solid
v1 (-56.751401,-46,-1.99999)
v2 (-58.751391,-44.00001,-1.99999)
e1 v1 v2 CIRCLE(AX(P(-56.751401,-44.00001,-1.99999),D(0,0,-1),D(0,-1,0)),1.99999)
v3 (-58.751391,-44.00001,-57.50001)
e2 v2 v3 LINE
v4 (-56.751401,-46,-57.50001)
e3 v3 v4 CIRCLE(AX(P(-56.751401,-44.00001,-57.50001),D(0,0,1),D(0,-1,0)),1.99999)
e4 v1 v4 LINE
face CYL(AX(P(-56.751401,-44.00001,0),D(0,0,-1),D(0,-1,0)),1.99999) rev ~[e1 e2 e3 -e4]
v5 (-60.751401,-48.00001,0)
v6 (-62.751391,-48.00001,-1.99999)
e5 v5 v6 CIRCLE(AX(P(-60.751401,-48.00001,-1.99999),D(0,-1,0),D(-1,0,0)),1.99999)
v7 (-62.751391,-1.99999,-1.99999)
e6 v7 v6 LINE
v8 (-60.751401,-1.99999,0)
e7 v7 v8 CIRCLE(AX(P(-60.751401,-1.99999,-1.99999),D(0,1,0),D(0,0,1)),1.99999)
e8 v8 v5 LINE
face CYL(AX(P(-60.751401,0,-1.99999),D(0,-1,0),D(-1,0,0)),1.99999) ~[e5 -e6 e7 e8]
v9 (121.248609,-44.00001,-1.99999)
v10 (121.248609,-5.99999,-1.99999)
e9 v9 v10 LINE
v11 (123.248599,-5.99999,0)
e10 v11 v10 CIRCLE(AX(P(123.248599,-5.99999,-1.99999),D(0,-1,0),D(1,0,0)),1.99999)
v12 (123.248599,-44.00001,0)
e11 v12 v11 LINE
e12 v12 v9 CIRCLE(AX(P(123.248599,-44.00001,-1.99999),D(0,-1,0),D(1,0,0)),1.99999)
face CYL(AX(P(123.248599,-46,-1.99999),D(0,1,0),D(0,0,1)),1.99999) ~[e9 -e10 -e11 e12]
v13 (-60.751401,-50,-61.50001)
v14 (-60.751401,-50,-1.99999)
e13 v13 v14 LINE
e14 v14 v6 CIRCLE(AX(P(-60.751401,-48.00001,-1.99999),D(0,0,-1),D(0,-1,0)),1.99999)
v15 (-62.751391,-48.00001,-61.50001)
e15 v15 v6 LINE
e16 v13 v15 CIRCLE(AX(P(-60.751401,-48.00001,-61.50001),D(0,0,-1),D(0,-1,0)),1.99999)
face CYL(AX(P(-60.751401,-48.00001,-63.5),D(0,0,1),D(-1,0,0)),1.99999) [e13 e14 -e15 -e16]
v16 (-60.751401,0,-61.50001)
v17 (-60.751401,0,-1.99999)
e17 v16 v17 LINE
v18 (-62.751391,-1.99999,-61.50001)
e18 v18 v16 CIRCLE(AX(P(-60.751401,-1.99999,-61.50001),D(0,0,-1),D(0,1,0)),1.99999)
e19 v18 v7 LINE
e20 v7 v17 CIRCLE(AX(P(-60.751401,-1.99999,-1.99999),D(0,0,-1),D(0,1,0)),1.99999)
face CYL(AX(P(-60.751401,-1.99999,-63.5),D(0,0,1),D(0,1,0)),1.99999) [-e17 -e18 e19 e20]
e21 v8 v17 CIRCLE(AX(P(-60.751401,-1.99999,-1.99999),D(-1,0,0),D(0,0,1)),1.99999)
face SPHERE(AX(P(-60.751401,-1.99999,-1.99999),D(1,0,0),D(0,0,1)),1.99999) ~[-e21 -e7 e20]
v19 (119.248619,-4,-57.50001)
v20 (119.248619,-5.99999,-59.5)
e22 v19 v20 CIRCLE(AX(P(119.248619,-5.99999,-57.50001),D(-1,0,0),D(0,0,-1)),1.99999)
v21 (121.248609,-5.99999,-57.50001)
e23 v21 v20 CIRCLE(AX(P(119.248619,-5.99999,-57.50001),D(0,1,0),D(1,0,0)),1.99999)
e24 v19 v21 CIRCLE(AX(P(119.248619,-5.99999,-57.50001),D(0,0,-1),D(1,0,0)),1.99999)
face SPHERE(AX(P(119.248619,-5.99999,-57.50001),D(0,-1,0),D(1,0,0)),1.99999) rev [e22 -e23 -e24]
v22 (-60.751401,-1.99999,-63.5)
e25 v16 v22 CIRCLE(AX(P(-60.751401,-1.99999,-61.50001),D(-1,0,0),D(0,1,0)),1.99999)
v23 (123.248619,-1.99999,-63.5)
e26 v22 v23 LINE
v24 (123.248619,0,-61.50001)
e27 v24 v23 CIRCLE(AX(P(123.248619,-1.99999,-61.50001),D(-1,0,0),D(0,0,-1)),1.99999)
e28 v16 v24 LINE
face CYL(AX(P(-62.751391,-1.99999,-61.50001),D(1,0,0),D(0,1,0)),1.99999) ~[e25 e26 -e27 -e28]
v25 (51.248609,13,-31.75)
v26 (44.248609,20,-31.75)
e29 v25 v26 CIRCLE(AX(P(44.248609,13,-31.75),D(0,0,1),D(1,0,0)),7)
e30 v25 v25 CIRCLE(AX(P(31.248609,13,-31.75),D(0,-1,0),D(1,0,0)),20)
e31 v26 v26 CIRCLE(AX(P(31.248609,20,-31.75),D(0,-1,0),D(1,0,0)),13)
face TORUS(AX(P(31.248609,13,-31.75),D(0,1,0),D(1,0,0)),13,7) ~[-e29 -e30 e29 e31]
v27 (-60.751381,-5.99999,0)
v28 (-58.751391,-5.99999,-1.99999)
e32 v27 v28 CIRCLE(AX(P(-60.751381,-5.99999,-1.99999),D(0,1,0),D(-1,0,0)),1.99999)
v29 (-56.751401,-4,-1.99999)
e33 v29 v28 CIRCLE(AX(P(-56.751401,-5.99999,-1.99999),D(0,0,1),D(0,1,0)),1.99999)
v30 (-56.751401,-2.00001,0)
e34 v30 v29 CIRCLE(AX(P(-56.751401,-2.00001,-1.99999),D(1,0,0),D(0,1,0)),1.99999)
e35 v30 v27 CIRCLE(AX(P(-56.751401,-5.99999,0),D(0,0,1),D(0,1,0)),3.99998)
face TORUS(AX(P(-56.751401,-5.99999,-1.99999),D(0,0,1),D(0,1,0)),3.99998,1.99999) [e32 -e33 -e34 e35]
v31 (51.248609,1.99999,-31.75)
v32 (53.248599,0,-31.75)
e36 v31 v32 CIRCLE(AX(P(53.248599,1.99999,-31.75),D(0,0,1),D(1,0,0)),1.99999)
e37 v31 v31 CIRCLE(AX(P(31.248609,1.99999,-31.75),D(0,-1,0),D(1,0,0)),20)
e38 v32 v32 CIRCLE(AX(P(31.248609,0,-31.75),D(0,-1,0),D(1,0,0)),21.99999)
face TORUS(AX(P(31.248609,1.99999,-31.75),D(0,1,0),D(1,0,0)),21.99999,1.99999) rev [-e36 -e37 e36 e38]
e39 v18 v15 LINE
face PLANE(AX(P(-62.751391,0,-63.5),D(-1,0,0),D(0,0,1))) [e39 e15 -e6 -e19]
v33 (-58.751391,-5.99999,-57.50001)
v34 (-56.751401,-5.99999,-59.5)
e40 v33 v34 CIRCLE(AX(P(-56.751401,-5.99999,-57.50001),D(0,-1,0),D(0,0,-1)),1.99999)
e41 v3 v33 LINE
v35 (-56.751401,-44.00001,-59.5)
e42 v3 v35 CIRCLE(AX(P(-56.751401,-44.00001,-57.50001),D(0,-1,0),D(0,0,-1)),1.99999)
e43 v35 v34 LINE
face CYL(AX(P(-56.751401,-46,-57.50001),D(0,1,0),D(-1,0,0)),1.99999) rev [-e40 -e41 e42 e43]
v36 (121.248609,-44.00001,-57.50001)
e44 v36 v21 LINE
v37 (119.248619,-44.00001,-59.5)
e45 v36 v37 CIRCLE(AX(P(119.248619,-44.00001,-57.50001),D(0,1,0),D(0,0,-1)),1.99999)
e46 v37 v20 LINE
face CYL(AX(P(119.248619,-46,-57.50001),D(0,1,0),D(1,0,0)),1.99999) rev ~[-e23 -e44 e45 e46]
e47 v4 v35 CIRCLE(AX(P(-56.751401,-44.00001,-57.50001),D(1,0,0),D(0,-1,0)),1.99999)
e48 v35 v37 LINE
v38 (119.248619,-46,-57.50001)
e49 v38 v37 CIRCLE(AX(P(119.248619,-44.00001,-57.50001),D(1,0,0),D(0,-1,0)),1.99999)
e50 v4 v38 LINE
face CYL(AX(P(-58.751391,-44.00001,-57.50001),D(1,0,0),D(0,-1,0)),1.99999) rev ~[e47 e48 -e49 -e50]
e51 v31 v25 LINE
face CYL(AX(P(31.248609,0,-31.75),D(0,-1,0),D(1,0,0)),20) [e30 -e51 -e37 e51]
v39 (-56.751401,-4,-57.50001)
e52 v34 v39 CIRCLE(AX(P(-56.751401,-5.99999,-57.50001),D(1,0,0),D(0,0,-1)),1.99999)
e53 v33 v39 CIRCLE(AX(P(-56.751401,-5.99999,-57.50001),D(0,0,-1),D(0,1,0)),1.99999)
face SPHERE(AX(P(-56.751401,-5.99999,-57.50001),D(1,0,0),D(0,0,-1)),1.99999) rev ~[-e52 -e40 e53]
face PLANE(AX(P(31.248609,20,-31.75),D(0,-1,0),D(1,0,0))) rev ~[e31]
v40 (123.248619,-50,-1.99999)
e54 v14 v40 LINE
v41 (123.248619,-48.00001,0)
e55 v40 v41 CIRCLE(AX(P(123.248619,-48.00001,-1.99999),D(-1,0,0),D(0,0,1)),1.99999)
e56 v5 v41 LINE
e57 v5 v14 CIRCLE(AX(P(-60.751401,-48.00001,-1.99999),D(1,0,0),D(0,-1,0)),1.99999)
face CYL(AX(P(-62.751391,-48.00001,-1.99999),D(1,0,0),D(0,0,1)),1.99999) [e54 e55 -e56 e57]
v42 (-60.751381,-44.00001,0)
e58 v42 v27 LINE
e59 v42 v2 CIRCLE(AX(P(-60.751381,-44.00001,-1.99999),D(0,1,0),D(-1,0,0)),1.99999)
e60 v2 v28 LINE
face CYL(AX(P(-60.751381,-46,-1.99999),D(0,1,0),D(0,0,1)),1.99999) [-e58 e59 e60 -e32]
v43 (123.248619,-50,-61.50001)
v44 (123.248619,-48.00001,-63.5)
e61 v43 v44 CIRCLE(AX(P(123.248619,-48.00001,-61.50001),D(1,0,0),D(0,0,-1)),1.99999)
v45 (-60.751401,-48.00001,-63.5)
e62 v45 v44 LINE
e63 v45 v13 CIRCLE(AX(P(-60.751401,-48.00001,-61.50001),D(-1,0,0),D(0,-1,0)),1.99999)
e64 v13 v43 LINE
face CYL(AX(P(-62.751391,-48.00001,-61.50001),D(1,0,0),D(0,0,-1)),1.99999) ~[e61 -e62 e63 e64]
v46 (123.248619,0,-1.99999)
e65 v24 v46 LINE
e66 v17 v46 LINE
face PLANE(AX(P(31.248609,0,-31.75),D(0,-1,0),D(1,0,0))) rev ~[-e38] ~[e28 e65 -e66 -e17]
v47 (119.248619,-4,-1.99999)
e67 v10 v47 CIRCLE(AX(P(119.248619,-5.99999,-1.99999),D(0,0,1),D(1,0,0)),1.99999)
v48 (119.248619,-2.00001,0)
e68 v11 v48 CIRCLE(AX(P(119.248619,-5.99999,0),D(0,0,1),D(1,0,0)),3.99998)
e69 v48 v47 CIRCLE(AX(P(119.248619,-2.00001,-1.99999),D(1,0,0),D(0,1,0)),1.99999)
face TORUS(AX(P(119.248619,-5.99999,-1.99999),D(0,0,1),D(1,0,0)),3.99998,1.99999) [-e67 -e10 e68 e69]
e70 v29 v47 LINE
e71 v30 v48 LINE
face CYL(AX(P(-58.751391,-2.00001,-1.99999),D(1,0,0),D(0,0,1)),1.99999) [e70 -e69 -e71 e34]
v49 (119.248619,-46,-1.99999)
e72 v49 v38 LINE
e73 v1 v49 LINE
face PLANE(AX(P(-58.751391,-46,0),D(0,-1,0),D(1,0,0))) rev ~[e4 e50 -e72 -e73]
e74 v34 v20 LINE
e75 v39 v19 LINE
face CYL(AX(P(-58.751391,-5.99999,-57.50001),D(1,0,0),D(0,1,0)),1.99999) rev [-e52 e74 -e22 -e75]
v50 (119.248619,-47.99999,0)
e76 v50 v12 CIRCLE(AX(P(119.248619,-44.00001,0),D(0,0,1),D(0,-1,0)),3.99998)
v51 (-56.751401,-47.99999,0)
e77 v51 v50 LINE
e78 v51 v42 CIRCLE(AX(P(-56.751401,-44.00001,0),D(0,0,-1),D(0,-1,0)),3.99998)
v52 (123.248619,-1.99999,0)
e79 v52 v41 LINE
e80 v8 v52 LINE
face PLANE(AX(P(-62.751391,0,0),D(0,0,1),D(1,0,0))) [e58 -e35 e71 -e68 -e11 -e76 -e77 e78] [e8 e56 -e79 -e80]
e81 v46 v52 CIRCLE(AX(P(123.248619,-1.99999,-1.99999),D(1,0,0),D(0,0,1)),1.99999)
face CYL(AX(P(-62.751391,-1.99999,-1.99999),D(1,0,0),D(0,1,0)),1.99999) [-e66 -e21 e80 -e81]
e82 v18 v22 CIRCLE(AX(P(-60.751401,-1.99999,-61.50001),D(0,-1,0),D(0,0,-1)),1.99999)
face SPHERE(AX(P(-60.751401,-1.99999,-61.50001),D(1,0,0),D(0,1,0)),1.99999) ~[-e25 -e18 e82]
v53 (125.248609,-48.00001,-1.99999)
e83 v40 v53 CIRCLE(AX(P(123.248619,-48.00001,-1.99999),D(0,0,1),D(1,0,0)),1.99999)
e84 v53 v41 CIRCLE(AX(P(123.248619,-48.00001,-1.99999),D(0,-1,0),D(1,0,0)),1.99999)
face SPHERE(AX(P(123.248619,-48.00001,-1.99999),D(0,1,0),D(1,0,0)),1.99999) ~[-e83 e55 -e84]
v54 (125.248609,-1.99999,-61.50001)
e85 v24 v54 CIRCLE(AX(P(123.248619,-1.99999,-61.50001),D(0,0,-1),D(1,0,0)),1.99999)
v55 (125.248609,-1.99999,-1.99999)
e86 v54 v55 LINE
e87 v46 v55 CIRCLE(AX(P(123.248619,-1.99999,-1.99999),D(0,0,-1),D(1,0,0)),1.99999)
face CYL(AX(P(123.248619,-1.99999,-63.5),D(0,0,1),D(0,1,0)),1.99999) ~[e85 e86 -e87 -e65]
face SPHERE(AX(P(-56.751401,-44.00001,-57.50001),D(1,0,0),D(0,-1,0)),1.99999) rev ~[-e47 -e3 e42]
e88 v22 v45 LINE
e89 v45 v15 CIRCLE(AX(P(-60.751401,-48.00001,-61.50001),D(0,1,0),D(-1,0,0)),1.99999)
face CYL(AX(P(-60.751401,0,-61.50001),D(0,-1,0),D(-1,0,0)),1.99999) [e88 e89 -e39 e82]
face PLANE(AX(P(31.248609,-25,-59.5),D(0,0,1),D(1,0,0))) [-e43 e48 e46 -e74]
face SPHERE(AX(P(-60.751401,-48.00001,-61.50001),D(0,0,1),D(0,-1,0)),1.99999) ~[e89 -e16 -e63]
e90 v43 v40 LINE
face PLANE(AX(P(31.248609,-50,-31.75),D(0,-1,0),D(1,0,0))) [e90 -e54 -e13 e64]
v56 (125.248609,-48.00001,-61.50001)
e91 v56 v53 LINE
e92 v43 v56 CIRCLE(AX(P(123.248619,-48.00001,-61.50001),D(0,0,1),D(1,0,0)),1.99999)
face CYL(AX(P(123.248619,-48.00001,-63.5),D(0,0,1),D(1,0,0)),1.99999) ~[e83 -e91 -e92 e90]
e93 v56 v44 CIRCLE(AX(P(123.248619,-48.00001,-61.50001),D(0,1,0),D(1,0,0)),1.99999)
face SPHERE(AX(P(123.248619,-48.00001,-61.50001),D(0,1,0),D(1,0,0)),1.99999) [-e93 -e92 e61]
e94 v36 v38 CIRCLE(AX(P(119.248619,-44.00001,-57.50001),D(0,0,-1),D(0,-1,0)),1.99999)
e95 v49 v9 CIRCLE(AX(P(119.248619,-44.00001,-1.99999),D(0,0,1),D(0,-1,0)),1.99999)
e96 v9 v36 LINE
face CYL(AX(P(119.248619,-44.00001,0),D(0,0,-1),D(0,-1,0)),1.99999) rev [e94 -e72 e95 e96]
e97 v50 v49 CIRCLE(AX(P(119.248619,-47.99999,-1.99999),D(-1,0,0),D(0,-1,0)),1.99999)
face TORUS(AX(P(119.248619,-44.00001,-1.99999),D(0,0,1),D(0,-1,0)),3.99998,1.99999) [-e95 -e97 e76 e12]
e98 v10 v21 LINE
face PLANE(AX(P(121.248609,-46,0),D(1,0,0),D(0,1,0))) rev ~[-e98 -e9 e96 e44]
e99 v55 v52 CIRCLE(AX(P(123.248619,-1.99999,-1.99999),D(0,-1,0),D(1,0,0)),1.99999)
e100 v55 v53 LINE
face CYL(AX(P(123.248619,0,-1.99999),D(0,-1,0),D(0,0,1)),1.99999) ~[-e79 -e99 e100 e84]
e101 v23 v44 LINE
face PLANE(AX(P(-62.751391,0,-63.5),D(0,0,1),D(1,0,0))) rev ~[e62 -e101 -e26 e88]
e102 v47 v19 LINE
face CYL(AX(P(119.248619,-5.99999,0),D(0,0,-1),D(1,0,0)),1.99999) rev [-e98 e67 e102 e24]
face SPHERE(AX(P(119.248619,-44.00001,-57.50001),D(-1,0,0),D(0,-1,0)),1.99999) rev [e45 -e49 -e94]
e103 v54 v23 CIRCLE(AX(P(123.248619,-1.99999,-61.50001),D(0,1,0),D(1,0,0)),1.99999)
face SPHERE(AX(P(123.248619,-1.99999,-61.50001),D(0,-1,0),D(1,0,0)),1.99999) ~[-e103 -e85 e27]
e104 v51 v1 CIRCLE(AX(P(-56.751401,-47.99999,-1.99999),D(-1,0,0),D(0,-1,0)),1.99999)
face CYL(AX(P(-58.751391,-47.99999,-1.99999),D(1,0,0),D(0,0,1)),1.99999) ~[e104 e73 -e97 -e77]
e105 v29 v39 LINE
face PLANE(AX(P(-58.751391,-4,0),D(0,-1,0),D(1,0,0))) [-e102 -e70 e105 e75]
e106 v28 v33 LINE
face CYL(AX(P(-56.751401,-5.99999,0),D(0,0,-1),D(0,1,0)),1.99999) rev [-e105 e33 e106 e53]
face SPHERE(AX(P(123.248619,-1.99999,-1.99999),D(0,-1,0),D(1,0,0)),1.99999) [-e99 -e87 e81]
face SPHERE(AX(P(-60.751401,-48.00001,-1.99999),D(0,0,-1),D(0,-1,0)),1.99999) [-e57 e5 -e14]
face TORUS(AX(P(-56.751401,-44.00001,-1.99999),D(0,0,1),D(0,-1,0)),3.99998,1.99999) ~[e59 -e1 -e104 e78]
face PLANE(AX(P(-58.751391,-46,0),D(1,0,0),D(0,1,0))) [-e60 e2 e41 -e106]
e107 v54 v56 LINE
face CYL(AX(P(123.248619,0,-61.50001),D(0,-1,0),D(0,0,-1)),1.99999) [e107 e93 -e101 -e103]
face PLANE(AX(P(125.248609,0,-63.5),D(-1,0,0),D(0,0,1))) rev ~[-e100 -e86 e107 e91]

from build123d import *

# Parameters (mm, degrees)
F0_W     = 188
F0_H     = 63.5
F1_DEPTH = 50
F2_W     = 180
F2_H     = 42
F3_DEPTH = 59.5
F4_R     = 20
F5_DEPTH = 20
F6_R     = 7
F7_R     = 1.99999


# Not quite as in the source:
# - a fillet or chamfer is up to 0.001 mm smaller than in the source, because OpenCascade refuses the exact size


with BuildPart() as f1:
    # F0 (on Front) → F1 (new body)
    with BuildSketch(Plane.XZ):
        with Locations((31.2486086041, -31.75)):
            Rectangle(F0_W, F0_H)
    extrude(amount=F1_DEPTH)

    # F2 (on Top) → F3 (cut)
    with BuildSketch(Plane.XY):
        with Locations((31.2486086041, -25)):
            Rectangle(F2_W, F2_H)
    extrude(amount=-F3_DEPTH, mode=Mode.SUBTRACT)

    # F4 (on Front) → F5 (join)
    with BuildSketch(Plane.XZ):
        with Locations((31.2486086041, -31.75)):
            Circle(F4_R)
    extrude(amount=-F5_DEPTH)

    # F6
    f6_edges = [f1.edges().sort_by_distance(p)[0] for p in [
        (11.248609, 20, -31.75),
    ]]
    fillet(f6_edges, radius=F6_R)

    # F7 (radius 2 in the source; OpenCascade refuses exactly that, so slightly less here)
    f7_edges = [f1.edges().sort_by_distance(p)[0] for p in [
        (125.248609, -25, 0),
        (125.248609, -25, -63.5),
        (125.248609, 0, -31.75),
        (125.248609, -50, -31.75),
        (31.248609, 0, 0),
        (-62.751391, -50, -31.75),
        (31.248609, -50, 0),
        (-62.751391, -25, 0),
        (31.248609, -46, 0),
        (121.248609, -25, 0),
        (31.248609, -46, -59.5),
        (31.248609, 0, -63.5),
        (121.248609, -46, -29.75),
        (121.248609, -25, -59.5),
        (31.248609, -4, 0),
        (-58.751391, -25, 0),
        (121.248609, -4, -29.75),
        (31.248609, -4, -59.5),
        (31.248609, -50, -63.5),
        (-58.751391, -46, -29.75),
        (18.248609, 20, -31.75),
        (11.248609, 0, -31.75),
        (11.248609, 13, -31.75),
        (-62.751391, 0, -31.75),
        (-58.751391, -25, -59.5),
        (-58.751391, -4, -29.75),
        (-62.751391, -25, -63.5),
    ]]
    fillet(f7_edges, radius=F7_R)


solid = f1.part
